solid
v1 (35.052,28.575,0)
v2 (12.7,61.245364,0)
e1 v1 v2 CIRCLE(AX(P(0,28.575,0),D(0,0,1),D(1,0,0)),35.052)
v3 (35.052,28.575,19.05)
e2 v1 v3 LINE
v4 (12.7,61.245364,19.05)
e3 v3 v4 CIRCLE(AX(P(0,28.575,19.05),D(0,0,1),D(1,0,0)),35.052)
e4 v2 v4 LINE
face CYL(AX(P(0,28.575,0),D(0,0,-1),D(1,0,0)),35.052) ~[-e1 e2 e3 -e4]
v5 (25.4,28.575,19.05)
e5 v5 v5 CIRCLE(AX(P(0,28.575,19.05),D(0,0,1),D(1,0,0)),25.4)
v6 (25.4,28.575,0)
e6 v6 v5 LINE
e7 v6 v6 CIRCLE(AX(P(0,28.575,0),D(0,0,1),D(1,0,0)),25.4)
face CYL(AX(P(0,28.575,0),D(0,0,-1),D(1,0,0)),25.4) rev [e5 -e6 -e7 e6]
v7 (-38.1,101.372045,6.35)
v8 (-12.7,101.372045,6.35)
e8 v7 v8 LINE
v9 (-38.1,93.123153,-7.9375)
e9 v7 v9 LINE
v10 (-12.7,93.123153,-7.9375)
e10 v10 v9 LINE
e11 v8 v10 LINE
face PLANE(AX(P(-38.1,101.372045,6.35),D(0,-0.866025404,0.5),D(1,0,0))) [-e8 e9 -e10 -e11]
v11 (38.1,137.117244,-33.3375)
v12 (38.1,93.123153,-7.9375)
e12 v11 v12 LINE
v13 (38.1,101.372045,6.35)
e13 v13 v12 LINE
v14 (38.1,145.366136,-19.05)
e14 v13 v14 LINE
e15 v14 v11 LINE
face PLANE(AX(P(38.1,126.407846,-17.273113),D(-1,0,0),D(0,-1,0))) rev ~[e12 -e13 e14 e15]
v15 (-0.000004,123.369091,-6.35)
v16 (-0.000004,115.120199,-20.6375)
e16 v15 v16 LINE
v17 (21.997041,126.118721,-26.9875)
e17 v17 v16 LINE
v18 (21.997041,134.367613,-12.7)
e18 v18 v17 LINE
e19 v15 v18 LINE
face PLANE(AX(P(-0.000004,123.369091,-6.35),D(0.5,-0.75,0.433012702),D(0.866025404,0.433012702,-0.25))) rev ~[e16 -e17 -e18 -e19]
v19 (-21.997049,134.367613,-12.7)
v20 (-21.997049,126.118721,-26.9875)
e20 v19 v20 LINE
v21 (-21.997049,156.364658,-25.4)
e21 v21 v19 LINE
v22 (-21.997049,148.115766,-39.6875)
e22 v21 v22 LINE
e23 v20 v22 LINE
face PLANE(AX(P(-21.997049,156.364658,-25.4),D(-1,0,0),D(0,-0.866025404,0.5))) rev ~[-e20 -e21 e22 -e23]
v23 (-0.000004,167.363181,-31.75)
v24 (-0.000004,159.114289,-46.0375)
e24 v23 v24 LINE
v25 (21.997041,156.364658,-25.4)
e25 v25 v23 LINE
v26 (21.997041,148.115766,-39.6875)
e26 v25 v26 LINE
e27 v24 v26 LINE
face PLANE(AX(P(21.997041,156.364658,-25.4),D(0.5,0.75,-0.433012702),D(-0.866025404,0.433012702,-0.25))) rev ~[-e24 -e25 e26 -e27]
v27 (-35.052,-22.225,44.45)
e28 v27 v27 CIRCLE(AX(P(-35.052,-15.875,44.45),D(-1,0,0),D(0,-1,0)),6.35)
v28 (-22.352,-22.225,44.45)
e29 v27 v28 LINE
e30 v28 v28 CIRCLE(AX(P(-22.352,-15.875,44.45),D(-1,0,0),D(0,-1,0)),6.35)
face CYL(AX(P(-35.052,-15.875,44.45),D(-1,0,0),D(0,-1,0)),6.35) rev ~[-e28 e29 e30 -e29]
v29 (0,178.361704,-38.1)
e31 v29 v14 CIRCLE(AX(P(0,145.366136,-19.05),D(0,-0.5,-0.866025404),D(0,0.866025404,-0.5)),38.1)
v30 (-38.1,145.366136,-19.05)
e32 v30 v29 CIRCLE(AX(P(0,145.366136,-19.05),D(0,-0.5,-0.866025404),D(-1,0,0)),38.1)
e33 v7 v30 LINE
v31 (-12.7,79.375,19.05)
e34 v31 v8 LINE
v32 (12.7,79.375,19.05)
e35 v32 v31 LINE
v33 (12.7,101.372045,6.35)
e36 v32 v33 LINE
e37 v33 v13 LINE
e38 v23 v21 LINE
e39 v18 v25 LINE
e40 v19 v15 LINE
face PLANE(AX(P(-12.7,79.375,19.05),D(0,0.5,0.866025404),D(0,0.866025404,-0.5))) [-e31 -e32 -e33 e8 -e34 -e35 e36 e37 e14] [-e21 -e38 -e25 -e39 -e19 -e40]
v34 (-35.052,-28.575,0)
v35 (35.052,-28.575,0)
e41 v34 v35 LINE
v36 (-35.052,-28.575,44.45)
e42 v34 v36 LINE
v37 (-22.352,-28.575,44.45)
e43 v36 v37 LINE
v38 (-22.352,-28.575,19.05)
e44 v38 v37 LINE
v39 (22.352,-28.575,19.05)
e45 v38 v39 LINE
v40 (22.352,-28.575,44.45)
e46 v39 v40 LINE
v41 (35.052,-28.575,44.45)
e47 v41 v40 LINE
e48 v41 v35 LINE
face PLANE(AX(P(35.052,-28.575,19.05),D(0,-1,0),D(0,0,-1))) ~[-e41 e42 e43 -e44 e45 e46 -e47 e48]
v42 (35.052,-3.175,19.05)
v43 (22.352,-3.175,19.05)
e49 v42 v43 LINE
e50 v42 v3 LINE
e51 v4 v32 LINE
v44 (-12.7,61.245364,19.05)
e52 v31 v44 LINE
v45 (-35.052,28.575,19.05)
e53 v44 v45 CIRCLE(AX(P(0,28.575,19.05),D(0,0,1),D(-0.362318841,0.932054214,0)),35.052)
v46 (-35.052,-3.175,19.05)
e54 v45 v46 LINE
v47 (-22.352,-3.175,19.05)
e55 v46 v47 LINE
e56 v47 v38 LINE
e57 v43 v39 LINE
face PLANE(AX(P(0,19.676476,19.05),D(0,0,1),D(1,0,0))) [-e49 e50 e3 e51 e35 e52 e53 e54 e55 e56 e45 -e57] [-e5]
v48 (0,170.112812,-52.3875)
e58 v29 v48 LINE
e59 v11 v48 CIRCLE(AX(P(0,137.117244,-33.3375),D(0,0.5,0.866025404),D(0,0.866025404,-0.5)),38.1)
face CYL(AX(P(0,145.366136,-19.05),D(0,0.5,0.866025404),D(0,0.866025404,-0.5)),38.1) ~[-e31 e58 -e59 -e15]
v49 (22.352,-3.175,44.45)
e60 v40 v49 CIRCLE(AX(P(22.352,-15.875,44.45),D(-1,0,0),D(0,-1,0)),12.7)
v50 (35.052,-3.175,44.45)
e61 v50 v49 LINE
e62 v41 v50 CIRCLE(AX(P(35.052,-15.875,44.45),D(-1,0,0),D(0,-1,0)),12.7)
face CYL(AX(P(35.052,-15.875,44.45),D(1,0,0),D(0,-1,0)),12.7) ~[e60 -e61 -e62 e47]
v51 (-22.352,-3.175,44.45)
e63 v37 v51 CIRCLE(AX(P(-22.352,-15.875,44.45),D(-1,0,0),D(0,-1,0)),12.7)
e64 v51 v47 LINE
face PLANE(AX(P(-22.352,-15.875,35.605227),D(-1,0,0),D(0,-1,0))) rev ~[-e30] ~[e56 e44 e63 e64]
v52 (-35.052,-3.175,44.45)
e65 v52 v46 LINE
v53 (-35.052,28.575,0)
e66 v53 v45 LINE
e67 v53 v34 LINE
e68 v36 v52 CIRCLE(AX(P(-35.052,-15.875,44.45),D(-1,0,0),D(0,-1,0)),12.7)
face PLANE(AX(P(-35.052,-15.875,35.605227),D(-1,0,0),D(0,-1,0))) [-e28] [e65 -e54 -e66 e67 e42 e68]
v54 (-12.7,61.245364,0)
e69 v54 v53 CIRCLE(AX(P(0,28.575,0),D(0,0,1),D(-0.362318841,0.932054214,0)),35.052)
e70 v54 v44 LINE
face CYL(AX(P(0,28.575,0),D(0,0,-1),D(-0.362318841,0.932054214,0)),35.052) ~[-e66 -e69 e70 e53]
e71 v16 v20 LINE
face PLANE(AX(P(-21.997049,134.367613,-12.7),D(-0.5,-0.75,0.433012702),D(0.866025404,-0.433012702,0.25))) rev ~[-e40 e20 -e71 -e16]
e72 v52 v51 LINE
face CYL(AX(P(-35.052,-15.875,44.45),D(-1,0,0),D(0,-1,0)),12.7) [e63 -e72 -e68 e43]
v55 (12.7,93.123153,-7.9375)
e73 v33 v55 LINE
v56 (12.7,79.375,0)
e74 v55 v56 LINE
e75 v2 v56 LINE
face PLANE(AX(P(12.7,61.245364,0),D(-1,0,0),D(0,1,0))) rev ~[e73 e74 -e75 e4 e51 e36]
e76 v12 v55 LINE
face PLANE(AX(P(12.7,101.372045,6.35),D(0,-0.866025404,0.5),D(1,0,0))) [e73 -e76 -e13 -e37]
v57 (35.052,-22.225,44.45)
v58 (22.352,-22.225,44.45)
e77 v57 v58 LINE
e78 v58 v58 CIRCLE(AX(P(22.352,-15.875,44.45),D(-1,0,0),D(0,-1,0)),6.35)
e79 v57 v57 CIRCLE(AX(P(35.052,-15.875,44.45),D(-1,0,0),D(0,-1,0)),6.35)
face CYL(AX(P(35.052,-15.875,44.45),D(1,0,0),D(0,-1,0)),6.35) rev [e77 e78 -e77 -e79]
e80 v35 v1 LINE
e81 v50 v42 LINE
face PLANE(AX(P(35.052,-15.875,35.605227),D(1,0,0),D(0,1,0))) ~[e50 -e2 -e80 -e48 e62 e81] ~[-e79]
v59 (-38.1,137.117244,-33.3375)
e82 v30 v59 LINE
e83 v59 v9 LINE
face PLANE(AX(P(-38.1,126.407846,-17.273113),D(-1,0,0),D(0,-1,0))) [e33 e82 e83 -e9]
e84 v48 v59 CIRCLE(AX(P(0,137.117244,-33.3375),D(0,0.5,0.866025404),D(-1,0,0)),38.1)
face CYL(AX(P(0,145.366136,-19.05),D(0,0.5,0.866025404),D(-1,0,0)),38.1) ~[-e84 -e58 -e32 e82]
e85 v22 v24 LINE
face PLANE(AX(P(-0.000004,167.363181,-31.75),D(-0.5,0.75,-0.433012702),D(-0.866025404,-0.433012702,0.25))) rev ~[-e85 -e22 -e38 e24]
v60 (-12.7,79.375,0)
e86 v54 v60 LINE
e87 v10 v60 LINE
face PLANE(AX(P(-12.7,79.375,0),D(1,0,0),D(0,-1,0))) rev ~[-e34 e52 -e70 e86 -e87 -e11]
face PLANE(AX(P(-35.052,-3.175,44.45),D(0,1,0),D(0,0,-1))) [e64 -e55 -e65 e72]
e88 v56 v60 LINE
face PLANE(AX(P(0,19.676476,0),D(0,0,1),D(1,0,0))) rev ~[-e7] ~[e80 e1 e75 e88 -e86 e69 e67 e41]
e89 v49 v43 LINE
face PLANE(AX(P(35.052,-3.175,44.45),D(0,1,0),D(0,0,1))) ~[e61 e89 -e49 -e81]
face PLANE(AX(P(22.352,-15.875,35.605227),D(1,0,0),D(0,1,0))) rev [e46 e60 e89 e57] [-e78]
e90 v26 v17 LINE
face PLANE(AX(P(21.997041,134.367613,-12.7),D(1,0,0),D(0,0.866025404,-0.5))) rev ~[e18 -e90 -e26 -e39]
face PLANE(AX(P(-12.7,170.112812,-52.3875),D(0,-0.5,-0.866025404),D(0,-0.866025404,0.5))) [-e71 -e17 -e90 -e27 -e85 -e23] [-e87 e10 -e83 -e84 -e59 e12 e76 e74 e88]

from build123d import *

# Parameters (mm, degrees)
F0_R          = 25.4
F1_DEPTH      = 19.05
F2_R          = 6.35
F3_DEPTH      = 12.7
F5_DEPTH      = 25.4
F5_DEPTH_BACK = 50.8
F6_W          = 25.4
F6_H          = 25.4
F7_DEPTH      = 25.4
F9_DEPTH      = 115.8426897829


# Not quite as in the source:
# - a pattern or mirror of a feature is missing from the dataset's text; its kind, count and spacing are read off the source's solid


with BuildPart() as f1:
    # F0 (on Top) → F1 (new body)
    with BuildSketch(Plane.XY):
        with BuildLine():
            Line((-35.052, -28.575), (35.052, -28.575))
            Line((35.052, -28.575), (35.052, 28.575))
            ThreePointArc((35.052, 28.575), (28.9292508026, 48.3674518946), (12.7, 61.2453643077))
            Line((12.7, 61.2453643077), (12.7, 79.375))
            Line((12.7, 79.375), (-12.7, 79.375))
            Line((-12.7, 79.375), (-12.7, 61.2453643077))
            ThreePointArc((-12.7, 61.2453643077), (-28.9292508026, 48.3674518946), (-35.052, 28.575))
            Line((-35.052, 28.575), (-35.052, -28.575))
        make_face()
        with Locations((0, 28.575)):
            Circle(F0_R, mode=Mode.SUBTRACT)
    extrude(amount=F1_DEPTH)

    # F2 (on face) → F3 (join)
    with BuildSketch(Plane(origin=(-35.052, 0, 0), x_dir=(0, -1, 0), z_dir=(-1, 0, 0))):
        with BuildLine():
            Line((3.175, 19.05), (28.575, 19.05))
            Line((28.575, 19.05), (28.575, 44.45))
            ThreePointArc((28.575, 44.45), (15.875, 57.15), (3.175, 44.45))
            Line((3.175, 44.45), (3.175, 19.05))
        make_face()
        with Locations((15.875, 44.45)):
            Circle(F2_R, mode=Mode.SUBTRACT)
    f3 = extrude(amount=-F3_DEPTH)

    # F3_copies: F3 across plane
    add(f3.mirror(Plane(origin=(0, 0, 0), x_dir=(0, 0, 1), z_dir=(1, 0, 0))))

    # F4 (on face) → F5 (join, two sides)
    with BuildSketch(Plane(origin=(-12.7, 0, 0), x_dir=(0, -1, 0), z_dir=(-1, 0, 0))) as f5_sk:
        Polygon((-79.375, 0), (-79.375, 19.05), (-178.3617036526, -38.1), (-170.1128116815, -52.3875), align=None)
    extrude(amount=F5_DEPTH)
    extrude(f5_sk.sketch, amount=-F5_DEPTH_BACK)

    # F6 (on face) → F7 (cut)
    with BuildSketch(Plane(origin=(0, 28.092641971, 48.6578832127), x_dir=(1, 0, 0), z_dir=(0, 0.5, 0.8660254038))):
        with Locations((25.4, 71.9157664254)):
            Rectangle(F6_W, F6_H)
        with Locations((-25.4, 71.9157664254)):
            Rectangle(F6_W, F6_H)
        with BuildLine():
            ThreePointArc((-38.1, 135.4157664254), (-26.9407683632, 162.3565347886), (0, 173.5157664254))
            Line((0, 173.5157664254), (-38.1, 173.5157664254))
            Line((-38.1, 173.5157664254), (-38.1, 135.4157664254))
        make_face()
        with BuildLine():
            ThreePointArc((0, 173.5157664254), (26.9407683632, 162.3565347886), (38.1, 135.4157664254))
            Line((38.1, 135.4157664254), (38.1, 173.5157664254))
            Line((38.1, 173.5157664254), (0, 173.5157664254))
        make_face()
    extrude(amount=-F7_DEPTH, mode=Mode.SUBTRACT)

    # F8 (on face) → F9 (cut, through all)
    with BuildSketch(Plane(origin=(0, 28.092641971, 48.6578832127), x_dir=(1, 0, 0), z_dir=(0, 0.5, 0.8660254038))):
        Polygon((21.9970411706, 148.1157664254), (-4.0856e-06, 160.8157664254), (-21.9970493417, 148.1157664254), (-21.9970493417, 122.7157664254), (-4.0856e-06, 110.0157664254), (21.9970411706, 122.7157664254), align=None)
    extrude(amount=-F9_DEPTH, mode=Mode.SUBTRACT)


solid = f1.part
